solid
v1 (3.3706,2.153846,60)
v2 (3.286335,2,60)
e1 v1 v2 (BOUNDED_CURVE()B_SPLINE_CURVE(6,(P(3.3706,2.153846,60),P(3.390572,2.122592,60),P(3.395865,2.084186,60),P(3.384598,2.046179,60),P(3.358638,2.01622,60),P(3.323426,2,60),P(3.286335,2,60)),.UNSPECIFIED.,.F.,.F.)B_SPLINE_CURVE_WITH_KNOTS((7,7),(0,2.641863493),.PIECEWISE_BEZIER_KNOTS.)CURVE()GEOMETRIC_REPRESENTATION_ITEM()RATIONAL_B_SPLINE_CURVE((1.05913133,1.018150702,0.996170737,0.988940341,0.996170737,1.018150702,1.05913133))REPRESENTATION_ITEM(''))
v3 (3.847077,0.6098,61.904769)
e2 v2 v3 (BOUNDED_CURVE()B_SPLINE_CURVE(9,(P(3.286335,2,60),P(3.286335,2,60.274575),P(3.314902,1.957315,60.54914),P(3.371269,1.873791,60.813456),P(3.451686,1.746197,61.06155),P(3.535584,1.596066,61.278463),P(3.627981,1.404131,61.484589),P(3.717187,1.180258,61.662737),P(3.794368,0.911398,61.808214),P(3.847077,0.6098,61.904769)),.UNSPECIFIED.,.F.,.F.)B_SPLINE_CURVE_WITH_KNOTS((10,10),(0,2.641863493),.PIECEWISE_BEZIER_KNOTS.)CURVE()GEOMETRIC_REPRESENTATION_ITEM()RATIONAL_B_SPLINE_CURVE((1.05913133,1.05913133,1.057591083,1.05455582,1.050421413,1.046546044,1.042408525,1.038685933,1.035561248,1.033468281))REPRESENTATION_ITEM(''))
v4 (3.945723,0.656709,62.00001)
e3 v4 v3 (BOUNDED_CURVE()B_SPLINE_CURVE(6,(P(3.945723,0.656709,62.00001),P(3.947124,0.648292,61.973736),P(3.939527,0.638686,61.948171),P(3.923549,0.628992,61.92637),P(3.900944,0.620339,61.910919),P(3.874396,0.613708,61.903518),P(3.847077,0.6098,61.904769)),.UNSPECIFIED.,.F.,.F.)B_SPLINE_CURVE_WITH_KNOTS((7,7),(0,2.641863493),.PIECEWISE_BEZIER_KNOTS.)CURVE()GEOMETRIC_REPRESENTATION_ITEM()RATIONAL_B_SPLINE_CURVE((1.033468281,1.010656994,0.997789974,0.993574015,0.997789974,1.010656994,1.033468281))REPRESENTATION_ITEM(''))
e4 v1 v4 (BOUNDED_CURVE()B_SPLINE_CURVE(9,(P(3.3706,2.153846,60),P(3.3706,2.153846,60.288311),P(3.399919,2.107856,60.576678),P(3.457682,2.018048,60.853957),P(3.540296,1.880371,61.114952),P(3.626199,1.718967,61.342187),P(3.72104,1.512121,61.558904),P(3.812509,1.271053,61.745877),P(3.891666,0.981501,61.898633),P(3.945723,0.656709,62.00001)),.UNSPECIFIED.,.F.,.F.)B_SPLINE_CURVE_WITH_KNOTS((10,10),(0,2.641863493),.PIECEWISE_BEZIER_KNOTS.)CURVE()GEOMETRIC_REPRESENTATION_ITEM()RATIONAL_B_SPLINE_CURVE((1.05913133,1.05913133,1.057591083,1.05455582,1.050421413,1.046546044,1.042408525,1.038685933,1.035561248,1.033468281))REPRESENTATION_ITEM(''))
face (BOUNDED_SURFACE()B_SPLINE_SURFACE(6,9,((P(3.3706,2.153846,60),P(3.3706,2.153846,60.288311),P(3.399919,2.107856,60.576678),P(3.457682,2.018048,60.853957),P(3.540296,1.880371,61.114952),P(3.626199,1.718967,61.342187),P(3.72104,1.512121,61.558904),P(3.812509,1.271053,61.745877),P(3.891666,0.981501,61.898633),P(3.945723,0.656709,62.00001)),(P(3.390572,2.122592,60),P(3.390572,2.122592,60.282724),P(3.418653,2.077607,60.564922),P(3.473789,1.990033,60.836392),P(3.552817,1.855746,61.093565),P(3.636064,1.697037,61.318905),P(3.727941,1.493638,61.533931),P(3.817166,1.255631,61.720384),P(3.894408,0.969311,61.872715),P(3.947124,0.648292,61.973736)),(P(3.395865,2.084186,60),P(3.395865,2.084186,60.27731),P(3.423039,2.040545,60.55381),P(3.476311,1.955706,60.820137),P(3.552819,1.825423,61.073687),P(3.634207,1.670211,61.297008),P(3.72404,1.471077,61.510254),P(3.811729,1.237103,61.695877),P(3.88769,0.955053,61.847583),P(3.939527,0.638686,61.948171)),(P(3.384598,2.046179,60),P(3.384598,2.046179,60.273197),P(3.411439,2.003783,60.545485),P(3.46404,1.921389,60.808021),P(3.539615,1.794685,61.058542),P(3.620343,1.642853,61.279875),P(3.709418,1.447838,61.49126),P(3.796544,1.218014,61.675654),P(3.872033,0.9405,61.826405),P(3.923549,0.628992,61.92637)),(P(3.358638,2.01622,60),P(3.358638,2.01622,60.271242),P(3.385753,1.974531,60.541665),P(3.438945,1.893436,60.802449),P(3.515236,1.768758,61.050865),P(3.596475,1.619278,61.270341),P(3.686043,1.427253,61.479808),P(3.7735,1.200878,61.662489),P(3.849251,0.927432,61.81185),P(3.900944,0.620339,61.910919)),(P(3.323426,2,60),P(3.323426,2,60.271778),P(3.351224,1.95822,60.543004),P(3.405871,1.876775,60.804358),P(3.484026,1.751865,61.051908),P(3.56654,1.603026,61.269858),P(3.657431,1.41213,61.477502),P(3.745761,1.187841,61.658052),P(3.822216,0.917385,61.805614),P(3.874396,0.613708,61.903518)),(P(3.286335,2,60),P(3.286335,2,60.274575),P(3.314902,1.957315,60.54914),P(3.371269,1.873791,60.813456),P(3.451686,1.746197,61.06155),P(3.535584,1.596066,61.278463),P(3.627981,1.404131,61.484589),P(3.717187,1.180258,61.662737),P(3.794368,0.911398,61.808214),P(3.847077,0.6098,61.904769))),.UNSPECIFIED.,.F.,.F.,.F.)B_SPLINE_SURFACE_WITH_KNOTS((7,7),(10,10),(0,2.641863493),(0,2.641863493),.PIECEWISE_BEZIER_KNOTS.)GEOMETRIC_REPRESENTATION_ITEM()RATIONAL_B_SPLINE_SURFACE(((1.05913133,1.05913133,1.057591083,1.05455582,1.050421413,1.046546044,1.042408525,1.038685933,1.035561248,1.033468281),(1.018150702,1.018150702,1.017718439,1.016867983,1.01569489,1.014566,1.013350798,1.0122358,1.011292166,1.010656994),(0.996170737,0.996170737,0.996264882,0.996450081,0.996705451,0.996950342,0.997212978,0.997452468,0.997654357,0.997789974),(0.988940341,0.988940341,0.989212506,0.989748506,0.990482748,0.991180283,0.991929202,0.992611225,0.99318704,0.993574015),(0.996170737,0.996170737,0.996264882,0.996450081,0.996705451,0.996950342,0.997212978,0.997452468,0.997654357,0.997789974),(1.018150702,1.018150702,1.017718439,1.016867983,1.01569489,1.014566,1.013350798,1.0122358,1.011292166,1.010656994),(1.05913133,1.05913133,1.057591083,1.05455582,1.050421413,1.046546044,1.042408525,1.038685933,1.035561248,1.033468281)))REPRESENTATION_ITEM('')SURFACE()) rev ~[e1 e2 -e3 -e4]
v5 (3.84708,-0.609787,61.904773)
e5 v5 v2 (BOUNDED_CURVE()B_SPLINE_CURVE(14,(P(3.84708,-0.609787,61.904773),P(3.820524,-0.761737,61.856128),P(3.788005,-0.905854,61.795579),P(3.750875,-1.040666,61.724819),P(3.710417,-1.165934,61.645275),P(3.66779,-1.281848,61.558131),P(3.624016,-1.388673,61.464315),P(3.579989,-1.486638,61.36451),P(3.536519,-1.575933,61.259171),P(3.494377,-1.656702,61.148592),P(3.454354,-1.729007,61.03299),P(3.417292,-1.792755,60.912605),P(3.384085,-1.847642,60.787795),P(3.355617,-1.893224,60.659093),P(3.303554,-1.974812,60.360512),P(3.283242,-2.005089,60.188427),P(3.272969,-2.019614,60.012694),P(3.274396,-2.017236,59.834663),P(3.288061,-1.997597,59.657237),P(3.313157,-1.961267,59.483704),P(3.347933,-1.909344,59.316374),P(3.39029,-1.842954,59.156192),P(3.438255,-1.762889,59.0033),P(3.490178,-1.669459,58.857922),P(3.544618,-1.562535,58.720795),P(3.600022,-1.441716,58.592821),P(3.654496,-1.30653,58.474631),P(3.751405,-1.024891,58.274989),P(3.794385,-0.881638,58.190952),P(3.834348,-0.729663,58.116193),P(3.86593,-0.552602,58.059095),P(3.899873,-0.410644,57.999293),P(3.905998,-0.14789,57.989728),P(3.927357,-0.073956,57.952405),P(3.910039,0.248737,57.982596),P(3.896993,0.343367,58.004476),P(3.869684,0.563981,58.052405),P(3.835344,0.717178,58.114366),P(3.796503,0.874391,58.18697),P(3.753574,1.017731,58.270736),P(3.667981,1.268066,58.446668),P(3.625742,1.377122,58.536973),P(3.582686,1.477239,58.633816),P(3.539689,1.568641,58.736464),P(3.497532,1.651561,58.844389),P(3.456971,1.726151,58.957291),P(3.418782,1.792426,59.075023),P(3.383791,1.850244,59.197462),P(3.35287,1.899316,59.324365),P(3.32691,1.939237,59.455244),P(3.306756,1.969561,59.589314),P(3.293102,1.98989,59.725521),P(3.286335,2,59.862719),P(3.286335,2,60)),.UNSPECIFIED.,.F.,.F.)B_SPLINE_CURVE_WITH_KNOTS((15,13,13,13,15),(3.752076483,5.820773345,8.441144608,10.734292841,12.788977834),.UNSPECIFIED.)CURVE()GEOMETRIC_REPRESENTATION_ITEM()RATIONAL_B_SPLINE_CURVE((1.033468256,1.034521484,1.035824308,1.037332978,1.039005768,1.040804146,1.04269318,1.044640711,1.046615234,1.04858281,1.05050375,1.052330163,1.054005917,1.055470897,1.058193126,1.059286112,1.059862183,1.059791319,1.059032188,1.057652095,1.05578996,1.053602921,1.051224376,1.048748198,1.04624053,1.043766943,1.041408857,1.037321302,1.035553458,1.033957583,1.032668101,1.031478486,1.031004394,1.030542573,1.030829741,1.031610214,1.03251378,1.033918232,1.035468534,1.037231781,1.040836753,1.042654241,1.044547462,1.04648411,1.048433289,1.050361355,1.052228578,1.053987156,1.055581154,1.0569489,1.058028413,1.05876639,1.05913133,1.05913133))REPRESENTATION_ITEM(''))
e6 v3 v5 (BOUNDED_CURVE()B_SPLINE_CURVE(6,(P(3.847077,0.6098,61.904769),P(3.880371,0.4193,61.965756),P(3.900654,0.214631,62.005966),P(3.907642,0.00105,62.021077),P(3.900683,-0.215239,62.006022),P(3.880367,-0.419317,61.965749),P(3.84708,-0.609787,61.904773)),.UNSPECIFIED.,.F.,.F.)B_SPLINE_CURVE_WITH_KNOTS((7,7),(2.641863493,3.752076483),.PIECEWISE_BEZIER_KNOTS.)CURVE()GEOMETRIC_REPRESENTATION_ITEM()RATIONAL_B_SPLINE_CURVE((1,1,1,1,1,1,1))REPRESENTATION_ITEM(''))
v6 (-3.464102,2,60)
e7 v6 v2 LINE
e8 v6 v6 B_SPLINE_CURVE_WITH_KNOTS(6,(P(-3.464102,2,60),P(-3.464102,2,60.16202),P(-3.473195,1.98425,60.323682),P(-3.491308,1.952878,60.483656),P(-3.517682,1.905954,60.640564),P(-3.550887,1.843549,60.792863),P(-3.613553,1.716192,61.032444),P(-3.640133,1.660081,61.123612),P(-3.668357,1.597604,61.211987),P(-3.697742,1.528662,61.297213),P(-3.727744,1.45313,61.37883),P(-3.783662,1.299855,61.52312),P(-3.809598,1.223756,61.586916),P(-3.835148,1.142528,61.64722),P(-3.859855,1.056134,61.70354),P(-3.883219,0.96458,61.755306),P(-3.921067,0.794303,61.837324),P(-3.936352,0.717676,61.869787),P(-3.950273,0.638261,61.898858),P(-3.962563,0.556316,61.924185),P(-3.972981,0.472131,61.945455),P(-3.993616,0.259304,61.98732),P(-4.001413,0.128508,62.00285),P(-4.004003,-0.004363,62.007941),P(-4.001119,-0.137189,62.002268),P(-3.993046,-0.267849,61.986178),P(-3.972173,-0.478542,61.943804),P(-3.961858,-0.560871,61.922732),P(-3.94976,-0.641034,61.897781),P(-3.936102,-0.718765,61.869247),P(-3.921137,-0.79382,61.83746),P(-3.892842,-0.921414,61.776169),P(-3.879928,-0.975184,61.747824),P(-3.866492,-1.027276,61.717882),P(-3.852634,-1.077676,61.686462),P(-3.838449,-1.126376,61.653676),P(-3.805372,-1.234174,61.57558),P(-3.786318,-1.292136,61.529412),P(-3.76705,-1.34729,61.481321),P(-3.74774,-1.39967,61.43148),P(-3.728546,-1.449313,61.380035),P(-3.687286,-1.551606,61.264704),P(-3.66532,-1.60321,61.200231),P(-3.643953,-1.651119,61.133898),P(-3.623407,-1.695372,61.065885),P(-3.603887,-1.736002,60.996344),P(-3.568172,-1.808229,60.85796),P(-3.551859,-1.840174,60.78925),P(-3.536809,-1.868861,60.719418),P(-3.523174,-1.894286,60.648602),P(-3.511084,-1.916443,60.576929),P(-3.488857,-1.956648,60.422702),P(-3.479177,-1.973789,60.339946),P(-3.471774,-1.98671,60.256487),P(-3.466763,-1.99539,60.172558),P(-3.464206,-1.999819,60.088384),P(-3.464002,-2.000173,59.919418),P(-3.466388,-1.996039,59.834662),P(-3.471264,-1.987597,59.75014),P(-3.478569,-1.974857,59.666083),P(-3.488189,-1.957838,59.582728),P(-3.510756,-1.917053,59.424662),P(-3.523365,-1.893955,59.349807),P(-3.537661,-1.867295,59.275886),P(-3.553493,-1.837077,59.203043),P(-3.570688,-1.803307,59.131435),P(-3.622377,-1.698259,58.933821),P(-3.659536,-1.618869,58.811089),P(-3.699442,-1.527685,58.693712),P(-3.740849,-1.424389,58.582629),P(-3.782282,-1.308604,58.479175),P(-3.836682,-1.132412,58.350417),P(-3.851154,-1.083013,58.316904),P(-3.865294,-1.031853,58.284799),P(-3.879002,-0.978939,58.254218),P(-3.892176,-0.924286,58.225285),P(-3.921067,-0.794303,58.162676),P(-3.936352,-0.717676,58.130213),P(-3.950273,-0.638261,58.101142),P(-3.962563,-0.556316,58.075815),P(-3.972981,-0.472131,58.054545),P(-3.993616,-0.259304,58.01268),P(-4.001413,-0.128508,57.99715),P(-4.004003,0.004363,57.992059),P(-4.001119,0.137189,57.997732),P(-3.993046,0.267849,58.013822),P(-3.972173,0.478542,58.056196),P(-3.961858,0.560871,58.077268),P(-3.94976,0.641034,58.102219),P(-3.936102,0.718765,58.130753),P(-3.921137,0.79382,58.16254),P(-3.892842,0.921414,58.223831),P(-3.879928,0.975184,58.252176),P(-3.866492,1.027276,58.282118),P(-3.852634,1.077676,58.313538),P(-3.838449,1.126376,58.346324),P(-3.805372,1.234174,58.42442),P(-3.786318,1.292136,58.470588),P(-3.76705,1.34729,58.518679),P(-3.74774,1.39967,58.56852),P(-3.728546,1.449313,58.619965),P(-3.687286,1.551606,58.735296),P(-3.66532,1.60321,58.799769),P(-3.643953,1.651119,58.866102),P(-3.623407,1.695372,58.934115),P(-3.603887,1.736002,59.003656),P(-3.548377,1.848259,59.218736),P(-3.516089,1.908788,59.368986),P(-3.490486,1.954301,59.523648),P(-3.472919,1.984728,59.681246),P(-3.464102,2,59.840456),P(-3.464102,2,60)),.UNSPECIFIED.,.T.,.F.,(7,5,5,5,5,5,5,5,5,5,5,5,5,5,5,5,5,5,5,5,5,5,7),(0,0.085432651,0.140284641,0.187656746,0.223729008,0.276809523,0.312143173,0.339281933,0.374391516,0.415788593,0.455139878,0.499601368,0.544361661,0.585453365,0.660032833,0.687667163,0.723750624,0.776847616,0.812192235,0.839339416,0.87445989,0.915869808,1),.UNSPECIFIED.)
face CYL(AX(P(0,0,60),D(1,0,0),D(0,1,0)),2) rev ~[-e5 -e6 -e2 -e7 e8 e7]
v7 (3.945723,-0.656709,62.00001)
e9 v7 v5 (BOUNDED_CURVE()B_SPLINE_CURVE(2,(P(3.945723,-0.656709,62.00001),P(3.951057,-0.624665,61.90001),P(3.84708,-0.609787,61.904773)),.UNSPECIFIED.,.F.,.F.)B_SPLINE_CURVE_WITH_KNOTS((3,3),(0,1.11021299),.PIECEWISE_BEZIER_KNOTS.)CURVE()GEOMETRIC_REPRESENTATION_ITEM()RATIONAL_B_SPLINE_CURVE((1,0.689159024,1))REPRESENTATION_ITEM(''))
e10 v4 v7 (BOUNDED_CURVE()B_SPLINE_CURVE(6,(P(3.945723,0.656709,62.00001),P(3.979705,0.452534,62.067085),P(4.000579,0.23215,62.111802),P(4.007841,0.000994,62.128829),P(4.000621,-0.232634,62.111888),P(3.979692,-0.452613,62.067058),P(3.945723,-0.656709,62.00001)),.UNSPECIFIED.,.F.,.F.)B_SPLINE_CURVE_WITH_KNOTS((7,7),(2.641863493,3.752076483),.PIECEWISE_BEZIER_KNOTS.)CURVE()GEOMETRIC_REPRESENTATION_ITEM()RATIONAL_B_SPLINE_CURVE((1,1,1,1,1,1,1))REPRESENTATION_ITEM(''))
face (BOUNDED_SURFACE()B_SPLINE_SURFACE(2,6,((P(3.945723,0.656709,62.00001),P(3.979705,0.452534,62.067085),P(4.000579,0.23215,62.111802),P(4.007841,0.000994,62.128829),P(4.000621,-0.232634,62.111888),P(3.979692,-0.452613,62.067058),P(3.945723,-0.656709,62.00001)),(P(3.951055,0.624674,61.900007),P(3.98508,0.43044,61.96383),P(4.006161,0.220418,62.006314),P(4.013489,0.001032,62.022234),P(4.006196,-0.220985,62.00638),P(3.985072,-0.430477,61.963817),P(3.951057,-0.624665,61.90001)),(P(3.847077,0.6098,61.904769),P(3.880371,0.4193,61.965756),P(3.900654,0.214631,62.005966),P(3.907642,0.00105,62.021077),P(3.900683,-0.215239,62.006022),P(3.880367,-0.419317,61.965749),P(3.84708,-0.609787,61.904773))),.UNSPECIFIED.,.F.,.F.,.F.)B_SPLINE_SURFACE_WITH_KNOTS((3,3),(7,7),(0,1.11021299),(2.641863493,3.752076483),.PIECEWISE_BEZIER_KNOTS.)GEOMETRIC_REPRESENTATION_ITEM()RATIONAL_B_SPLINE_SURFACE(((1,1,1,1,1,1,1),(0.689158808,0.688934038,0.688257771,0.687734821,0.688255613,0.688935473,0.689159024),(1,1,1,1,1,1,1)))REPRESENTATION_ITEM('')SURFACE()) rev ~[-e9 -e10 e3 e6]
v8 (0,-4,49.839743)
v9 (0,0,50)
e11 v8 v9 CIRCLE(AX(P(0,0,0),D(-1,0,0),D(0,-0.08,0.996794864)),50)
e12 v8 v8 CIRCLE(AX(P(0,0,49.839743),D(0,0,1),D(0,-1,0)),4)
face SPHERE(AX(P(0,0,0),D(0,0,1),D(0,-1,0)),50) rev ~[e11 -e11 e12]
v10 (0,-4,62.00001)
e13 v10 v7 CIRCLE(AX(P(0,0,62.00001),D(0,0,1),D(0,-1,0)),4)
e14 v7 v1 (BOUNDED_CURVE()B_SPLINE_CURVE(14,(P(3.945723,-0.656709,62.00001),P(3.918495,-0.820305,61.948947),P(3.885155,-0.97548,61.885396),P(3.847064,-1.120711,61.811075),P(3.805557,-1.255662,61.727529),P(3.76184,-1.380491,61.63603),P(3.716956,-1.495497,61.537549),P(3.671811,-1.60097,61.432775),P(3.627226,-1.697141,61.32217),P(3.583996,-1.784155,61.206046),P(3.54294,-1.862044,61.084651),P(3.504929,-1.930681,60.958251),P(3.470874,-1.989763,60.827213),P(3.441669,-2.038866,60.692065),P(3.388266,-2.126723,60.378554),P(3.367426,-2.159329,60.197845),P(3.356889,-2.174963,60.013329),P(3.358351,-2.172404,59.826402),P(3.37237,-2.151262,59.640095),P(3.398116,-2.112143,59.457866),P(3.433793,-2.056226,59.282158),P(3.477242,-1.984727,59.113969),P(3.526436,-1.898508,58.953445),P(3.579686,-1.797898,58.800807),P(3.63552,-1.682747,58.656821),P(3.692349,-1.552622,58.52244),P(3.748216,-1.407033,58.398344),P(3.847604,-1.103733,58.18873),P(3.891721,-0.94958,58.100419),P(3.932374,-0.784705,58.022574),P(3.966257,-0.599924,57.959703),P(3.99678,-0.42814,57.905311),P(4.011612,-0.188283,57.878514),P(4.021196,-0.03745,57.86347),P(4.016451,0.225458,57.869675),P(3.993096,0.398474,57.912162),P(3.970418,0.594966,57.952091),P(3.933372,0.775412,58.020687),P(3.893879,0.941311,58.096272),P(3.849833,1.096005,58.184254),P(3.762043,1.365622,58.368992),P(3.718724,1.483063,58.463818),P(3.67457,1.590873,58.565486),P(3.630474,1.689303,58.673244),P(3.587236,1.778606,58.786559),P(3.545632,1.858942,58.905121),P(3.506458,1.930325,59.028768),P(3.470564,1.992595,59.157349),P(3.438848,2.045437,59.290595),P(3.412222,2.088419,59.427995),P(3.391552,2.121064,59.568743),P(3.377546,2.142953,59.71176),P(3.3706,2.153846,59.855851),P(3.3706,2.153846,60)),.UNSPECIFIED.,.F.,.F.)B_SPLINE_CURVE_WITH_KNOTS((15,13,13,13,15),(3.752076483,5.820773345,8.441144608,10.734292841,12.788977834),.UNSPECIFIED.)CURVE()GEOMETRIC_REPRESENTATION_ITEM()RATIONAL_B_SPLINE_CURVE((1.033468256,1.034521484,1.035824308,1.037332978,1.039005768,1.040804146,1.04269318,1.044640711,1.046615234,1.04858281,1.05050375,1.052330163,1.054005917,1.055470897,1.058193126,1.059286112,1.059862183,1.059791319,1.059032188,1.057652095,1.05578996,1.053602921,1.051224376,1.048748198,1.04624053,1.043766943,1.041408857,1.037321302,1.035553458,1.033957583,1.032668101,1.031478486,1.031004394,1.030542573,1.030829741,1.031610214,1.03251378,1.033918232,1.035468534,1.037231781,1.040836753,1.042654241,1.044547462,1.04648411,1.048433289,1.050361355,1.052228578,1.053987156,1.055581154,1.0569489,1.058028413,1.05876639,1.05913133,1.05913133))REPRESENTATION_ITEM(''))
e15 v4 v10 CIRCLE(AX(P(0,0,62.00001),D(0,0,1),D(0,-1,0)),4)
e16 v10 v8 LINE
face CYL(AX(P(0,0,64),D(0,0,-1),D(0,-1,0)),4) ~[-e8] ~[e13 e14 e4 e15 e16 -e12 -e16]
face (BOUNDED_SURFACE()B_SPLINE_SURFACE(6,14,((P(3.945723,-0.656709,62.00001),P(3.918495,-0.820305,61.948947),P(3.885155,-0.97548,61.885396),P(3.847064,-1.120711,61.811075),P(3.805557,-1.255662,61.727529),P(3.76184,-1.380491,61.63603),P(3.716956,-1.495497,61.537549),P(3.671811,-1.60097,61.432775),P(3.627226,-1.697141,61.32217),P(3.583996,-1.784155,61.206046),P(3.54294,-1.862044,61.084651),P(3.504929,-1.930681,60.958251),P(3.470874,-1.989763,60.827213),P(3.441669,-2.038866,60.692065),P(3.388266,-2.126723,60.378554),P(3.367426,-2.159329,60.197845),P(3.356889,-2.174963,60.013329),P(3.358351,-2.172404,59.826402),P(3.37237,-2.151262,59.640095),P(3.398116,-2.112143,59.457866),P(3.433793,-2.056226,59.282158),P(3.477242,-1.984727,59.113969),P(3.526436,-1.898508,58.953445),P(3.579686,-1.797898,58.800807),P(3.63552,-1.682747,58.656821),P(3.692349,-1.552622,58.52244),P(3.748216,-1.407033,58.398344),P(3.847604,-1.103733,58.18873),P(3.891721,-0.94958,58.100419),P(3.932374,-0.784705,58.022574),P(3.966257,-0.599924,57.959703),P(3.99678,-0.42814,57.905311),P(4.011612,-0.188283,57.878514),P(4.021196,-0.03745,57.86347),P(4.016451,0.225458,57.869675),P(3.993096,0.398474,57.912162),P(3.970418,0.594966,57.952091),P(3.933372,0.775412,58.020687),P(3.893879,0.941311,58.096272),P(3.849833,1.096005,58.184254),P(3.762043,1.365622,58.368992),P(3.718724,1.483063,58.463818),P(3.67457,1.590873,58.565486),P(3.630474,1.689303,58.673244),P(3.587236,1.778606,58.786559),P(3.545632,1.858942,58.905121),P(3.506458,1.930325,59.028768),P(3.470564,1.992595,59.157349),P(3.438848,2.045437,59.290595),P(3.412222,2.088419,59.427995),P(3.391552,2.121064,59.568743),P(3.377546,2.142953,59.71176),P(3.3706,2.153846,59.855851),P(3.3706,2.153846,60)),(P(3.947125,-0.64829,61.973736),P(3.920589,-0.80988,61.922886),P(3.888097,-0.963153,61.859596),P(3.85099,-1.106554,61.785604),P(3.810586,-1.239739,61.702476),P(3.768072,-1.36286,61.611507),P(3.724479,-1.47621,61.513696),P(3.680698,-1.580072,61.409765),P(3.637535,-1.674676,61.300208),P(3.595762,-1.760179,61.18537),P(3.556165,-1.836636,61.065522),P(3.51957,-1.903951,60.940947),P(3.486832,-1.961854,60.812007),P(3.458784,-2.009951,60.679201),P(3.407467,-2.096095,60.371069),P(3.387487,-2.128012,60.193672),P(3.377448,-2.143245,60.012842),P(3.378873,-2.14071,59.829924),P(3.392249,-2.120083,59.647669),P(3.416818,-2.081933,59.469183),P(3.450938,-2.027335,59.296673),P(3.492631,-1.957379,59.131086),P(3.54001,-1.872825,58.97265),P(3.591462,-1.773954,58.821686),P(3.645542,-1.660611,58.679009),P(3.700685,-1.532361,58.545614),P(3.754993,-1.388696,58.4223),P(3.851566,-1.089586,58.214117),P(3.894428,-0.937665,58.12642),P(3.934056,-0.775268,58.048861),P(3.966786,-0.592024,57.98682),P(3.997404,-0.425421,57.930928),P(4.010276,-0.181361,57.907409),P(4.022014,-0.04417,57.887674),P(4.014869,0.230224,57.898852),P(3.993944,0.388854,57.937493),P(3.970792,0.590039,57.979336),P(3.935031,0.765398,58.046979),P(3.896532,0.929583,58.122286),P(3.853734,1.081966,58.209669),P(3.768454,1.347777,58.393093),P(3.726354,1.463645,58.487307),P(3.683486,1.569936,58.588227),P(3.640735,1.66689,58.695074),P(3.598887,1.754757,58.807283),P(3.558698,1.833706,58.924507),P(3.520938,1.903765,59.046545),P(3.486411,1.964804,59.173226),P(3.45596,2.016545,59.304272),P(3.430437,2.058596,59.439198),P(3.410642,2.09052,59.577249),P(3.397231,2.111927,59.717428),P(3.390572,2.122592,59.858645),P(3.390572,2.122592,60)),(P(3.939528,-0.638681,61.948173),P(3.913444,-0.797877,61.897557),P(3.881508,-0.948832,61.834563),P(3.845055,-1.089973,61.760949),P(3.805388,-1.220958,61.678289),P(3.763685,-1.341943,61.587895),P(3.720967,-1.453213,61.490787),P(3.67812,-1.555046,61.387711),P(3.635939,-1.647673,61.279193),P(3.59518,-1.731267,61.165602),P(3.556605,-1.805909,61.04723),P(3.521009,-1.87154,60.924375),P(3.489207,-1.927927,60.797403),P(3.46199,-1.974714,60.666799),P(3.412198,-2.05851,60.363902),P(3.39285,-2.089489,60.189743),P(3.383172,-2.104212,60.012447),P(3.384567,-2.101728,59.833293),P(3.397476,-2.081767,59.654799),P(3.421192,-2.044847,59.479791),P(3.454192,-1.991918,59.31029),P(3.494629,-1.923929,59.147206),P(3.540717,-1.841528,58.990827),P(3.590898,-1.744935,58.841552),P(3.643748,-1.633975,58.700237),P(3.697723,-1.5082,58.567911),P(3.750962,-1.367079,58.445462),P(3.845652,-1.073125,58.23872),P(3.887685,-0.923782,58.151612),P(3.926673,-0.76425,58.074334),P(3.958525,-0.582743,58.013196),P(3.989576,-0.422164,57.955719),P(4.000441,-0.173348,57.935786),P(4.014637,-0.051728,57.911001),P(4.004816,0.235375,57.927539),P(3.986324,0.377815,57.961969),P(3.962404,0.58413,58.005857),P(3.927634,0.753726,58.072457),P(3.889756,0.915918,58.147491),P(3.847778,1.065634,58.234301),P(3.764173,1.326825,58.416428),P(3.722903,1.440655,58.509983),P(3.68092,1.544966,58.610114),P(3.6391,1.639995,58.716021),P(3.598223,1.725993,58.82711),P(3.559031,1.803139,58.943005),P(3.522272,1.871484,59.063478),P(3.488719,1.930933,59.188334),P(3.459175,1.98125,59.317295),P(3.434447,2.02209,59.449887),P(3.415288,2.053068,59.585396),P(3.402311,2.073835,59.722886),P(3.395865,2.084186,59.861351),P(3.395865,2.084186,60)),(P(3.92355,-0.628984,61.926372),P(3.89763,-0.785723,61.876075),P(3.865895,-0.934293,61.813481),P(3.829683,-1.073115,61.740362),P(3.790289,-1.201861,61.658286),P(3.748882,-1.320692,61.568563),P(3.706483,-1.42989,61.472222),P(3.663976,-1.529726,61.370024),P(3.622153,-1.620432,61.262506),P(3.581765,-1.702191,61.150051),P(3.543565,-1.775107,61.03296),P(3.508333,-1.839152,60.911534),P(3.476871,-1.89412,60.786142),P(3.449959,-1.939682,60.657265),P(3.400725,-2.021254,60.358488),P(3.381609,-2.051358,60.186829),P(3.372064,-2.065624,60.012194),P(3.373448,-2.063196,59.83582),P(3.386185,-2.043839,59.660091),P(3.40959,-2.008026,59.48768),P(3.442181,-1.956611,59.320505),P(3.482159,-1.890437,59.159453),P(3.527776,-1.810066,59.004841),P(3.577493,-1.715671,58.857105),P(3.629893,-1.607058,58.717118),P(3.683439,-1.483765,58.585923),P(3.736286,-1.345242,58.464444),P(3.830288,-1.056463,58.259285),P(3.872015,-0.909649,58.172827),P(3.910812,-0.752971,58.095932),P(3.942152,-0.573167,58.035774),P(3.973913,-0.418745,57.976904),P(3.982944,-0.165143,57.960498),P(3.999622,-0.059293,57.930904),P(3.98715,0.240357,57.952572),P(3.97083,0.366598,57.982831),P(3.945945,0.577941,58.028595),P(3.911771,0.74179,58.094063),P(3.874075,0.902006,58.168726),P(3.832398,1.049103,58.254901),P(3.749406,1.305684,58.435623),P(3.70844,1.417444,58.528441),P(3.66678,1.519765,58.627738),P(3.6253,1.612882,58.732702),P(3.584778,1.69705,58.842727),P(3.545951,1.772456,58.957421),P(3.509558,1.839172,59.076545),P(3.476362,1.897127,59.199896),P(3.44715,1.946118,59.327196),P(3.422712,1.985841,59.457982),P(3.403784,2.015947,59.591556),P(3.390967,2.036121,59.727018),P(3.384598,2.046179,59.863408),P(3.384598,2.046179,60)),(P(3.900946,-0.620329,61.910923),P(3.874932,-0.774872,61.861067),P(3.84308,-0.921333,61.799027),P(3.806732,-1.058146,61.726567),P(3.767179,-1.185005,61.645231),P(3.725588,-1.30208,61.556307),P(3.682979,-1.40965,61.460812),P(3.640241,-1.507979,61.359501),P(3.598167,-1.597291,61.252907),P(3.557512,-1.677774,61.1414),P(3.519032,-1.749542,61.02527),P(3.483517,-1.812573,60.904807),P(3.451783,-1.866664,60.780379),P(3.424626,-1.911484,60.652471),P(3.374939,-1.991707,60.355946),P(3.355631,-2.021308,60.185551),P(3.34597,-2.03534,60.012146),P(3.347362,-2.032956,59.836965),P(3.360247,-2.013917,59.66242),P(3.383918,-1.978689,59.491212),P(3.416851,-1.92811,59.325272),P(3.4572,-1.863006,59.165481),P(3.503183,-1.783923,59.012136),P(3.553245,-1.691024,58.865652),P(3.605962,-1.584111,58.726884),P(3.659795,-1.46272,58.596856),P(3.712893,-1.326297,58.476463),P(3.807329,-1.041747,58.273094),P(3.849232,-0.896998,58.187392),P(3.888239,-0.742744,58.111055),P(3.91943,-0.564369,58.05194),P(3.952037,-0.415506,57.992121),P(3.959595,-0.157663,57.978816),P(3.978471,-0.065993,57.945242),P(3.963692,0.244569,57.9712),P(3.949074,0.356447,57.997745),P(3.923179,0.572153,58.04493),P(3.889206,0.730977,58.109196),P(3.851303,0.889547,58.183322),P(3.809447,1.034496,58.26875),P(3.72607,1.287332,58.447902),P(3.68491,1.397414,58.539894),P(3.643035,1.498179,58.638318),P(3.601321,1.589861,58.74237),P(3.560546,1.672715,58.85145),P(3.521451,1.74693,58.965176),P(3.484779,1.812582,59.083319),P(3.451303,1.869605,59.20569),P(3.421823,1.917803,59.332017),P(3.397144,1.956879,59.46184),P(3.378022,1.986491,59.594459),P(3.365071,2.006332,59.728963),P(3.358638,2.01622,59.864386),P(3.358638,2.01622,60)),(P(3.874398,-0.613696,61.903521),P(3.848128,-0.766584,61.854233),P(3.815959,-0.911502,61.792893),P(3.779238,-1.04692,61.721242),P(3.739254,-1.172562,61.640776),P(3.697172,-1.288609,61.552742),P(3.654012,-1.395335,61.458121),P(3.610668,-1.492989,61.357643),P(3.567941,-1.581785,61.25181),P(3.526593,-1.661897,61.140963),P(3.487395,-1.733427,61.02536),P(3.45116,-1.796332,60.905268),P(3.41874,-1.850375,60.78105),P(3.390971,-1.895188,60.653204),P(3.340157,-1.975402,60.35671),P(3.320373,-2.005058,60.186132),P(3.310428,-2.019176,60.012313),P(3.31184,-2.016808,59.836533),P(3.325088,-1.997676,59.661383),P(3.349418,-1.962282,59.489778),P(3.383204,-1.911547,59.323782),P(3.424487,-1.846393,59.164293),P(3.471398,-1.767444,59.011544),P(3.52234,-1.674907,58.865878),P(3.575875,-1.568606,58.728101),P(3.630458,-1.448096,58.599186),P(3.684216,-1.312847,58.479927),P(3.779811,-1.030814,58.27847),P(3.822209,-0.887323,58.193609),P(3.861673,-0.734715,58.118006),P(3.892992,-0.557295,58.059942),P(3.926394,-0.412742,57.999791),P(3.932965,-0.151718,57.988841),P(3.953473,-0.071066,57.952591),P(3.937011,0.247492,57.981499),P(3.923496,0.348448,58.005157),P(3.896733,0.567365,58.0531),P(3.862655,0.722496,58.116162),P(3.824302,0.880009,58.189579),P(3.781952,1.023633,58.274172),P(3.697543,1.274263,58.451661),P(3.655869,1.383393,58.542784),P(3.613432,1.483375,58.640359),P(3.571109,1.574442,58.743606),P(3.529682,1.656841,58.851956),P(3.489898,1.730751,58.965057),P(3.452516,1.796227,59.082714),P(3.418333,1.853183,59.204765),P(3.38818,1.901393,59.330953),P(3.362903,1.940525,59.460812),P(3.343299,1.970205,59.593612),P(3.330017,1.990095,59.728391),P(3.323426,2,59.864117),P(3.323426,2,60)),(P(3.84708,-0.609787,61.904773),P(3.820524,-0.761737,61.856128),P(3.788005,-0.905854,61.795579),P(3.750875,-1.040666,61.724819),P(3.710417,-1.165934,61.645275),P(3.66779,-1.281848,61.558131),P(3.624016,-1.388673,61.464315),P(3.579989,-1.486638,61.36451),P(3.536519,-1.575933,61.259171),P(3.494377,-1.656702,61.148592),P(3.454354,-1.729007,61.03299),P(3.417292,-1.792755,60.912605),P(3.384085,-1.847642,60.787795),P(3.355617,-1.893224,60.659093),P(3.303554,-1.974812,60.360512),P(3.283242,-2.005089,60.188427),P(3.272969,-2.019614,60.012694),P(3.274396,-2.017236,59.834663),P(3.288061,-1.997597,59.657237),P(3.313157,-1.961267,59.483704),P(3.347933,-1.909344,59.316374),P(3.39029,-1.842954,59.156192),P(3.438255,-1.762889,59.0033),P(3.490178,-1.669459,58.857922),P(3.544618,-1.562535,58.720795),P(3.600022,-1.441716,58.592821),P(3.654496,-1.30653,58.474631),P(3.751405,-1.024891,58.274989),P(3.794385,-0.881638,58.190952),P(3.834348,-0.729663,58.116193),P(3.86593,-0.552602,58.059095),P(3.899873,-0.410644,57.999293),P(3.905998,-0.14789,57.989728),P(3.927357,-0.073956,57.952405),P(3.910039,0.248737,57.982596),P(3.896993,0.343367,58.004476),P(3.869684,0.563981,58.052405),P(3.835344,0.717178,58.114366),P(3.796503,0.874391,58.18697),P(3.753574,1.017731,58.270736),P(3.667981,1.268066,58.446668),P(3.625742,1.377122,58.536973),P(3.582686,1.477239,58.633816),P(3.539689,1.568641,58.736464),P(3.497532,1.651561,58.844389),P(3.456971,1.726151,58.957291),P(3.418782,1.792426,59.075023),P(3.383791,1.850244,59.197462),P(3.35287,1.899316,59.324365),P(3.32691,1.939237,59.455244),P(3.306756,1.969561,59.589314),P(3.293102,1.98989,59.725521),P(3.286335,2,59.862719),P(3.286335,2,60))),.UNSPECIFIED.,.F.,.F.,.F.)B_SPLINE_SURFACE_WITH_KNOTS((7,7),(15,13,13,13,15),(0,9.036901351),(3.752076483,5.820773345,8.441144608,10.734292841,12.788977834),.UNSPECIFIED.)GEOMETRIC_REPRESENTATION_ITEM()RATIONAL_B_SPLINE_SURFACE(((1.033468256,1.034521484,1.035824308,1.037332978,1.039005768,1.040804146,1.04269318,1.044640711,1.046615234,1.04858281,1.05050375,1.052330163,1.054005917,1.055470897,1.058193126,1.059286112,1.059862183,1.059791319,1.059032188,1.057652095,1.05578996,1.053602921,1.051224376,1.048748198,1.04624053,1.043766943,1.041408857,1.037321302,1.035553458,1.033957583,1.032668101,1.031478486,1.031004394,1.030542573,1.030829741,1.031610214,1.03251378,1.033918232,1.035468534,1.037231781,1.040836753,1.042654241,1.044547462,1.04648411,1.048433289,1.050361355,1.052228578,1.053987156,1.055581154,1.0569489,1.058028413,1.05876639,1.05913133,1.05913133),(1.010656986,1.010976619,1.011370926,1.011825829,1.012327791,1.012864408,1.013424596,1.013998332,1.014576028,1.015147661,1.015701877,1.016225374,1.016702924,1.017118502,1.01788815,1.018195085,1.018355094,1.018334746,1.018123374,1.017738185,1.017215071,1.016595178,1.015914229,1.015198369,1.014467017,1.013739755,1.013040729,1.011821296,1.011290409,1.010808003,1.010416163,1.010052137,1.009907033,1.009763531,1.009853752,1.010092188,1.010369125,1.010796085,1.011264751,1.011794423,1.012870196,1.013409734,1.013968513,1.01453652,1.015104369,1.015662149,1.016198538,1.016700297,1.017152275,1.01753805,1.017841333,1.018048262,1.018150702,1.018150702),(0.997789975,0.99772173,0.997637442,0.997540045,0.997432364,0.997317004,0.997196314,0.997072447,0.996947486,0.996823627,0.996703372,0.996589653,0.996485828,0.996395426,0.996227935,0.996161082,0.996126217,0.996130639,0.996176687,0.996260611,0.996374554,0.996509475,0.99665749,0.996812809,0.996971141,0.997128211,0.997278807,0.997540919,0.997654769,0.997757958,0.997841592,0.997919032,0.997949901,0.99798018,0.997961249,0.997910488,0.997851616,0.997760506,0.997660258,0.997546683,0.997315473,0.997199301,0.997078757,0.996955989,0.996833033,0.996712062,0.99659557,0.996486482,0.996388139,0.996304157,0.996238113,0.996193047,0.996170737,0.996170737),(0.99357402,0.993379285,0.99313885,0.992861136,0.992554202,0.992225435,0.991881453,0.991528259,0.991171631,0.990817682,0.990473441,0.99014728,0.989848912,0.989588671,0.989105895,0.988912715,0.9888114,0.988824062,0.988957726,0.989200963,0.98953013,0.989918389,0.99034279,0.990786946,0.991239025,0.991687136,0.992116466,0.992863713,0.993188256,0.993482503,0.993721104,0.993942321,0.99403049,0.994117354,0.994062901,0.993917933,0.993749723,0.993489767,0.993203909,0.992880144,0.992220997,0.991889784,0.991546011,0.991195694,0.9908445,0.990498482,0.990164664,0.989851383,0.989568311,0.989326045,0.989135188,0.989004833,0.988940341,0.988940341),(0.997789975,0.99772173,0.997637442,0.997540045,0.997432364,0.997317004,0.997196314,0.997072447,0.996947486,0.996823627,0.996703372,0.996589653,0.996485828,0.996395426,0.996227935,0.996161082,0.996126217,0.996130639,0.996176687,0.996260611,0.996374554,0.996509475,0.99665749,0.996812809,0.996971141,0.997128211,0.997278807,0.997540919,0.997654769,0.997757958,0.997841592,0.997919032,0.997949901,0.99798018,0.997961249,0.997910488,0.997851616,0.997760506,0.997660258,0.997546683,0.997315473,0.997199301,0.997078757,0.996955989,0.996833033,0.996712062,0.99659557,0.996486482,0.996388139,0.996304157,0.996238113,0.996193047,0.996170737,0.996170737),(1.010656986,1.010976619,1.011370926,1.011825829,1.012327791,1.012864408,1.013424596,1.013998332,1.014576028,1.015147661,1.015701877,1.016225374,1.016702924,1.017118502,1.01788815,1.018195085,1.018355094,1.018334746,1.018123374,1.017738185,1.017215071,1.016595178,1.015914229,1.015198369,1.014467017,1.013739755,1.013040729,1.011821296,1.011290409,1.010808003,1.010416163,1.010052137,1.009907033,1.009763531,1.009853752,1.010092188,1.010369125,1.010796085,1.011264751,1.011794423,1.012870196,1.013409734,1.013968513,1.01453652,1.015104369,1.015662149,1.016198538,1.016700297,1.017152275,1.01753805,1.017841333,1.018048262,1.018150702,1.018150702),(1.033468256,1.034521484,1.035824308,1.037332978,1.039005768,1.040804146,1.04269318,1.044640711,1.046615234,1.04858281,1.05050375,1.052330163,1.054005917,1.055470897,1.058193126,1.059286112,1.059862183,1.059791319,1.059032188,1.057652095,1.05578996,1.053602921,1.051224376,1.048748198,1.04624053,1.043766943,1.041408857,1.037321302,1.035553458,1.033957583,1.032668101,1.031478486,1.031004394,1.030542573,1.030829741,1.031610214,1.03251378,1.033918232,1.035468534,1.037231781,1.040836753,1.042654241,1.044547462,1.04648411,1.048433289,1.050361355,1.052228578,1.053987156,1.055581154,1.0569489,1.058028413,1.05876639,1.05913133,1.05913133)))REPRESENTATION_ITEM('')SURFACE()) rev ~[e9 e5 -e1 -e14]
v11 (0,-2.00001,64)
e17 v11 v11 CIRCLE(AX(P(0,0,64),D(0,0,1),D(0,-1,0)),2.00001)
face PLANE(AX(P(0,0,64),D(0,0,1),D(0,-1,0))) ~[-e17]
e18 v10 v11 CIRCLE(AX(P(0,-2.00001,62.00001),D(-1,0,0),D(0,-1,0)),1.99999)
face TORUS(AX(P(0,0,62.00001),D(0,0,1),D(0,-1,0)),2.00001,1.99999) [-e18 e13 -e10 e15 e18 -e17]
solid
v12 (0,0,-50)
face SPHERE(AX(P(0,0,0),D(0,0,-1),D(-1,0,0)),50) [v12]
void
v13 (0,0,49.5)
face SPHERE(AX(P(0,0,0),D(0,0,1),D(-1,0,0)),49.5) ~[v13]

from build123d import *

# Parameters (mm, degrees)
F4_R     = 2
F5_DEPTH = 12.5
F6_R     = 1.99999
F7_R     = 0.1


# Not quite as in the source:
# - a fillet or chamfer is up to 0.001 mm smaller than in the source, because OpenCascade refuses the exact size


with BuildPart() as f1:
    # F0 (on Front) → F1 (revolve)
    with BuildSketch(Plane.XZ):
        with BuildLine():
            Line((0, 49.5), (0, 50))
            ThreePointArc((0, 50), (-50, 0), (0, -50))
            Line((0, -50), (0, -49.5))
            ThreePointArc((0, -49.5), (-49.5, 0), (0, 49.5))
        make_face()
    revolve(axis=Axis((0, 0, 0), (0, 0, -1)))


with BuildPart() as f3:
    # F2 (on Right) → F3 (revolve)
    with BuildSketch(Plane.YZ):
        with BuildLine():
            ThreePointArc((-4, 49.8397431775), (-2.001604497, 49.9599197301), (0, 50))
            Line((0, 50), (0, 64))
            Line((0, 64), (-4, 64))
            Line((-4, 64), (-4, 49.8397431775))
        make_face()
    revolve(axis=Axis((0, 0, 56.9119527936), (0, 0, 1)))

    # F4 (on Right) → F5 (cut, symmetric)
    with BuildSketch(Plane.YZ):
        with Locations((0, 60)):
            Circle(F4_R)
    extrude(amount=F5_DEPTH, both=True, mode=Mode.SUBTRACT)

    # F6 (radius 2 in the source; OpenCascade refuses exactly that, so slightly less here)
    f6_edges = [f3.edges().sort_by_distance(p)[0] for p in [
        (0, 4, 64),
    ]]
    fillet(f6_edges, radius=F6_R)

    # F7
    f7_edges = [f3.edges().sort_by_distance(p)[0] for p in [
        (3.464102, -2, 60),
    ]]
    fillet(f7_edges, radius=F7_R)


solid = Compound([f1.part, f3.part])
